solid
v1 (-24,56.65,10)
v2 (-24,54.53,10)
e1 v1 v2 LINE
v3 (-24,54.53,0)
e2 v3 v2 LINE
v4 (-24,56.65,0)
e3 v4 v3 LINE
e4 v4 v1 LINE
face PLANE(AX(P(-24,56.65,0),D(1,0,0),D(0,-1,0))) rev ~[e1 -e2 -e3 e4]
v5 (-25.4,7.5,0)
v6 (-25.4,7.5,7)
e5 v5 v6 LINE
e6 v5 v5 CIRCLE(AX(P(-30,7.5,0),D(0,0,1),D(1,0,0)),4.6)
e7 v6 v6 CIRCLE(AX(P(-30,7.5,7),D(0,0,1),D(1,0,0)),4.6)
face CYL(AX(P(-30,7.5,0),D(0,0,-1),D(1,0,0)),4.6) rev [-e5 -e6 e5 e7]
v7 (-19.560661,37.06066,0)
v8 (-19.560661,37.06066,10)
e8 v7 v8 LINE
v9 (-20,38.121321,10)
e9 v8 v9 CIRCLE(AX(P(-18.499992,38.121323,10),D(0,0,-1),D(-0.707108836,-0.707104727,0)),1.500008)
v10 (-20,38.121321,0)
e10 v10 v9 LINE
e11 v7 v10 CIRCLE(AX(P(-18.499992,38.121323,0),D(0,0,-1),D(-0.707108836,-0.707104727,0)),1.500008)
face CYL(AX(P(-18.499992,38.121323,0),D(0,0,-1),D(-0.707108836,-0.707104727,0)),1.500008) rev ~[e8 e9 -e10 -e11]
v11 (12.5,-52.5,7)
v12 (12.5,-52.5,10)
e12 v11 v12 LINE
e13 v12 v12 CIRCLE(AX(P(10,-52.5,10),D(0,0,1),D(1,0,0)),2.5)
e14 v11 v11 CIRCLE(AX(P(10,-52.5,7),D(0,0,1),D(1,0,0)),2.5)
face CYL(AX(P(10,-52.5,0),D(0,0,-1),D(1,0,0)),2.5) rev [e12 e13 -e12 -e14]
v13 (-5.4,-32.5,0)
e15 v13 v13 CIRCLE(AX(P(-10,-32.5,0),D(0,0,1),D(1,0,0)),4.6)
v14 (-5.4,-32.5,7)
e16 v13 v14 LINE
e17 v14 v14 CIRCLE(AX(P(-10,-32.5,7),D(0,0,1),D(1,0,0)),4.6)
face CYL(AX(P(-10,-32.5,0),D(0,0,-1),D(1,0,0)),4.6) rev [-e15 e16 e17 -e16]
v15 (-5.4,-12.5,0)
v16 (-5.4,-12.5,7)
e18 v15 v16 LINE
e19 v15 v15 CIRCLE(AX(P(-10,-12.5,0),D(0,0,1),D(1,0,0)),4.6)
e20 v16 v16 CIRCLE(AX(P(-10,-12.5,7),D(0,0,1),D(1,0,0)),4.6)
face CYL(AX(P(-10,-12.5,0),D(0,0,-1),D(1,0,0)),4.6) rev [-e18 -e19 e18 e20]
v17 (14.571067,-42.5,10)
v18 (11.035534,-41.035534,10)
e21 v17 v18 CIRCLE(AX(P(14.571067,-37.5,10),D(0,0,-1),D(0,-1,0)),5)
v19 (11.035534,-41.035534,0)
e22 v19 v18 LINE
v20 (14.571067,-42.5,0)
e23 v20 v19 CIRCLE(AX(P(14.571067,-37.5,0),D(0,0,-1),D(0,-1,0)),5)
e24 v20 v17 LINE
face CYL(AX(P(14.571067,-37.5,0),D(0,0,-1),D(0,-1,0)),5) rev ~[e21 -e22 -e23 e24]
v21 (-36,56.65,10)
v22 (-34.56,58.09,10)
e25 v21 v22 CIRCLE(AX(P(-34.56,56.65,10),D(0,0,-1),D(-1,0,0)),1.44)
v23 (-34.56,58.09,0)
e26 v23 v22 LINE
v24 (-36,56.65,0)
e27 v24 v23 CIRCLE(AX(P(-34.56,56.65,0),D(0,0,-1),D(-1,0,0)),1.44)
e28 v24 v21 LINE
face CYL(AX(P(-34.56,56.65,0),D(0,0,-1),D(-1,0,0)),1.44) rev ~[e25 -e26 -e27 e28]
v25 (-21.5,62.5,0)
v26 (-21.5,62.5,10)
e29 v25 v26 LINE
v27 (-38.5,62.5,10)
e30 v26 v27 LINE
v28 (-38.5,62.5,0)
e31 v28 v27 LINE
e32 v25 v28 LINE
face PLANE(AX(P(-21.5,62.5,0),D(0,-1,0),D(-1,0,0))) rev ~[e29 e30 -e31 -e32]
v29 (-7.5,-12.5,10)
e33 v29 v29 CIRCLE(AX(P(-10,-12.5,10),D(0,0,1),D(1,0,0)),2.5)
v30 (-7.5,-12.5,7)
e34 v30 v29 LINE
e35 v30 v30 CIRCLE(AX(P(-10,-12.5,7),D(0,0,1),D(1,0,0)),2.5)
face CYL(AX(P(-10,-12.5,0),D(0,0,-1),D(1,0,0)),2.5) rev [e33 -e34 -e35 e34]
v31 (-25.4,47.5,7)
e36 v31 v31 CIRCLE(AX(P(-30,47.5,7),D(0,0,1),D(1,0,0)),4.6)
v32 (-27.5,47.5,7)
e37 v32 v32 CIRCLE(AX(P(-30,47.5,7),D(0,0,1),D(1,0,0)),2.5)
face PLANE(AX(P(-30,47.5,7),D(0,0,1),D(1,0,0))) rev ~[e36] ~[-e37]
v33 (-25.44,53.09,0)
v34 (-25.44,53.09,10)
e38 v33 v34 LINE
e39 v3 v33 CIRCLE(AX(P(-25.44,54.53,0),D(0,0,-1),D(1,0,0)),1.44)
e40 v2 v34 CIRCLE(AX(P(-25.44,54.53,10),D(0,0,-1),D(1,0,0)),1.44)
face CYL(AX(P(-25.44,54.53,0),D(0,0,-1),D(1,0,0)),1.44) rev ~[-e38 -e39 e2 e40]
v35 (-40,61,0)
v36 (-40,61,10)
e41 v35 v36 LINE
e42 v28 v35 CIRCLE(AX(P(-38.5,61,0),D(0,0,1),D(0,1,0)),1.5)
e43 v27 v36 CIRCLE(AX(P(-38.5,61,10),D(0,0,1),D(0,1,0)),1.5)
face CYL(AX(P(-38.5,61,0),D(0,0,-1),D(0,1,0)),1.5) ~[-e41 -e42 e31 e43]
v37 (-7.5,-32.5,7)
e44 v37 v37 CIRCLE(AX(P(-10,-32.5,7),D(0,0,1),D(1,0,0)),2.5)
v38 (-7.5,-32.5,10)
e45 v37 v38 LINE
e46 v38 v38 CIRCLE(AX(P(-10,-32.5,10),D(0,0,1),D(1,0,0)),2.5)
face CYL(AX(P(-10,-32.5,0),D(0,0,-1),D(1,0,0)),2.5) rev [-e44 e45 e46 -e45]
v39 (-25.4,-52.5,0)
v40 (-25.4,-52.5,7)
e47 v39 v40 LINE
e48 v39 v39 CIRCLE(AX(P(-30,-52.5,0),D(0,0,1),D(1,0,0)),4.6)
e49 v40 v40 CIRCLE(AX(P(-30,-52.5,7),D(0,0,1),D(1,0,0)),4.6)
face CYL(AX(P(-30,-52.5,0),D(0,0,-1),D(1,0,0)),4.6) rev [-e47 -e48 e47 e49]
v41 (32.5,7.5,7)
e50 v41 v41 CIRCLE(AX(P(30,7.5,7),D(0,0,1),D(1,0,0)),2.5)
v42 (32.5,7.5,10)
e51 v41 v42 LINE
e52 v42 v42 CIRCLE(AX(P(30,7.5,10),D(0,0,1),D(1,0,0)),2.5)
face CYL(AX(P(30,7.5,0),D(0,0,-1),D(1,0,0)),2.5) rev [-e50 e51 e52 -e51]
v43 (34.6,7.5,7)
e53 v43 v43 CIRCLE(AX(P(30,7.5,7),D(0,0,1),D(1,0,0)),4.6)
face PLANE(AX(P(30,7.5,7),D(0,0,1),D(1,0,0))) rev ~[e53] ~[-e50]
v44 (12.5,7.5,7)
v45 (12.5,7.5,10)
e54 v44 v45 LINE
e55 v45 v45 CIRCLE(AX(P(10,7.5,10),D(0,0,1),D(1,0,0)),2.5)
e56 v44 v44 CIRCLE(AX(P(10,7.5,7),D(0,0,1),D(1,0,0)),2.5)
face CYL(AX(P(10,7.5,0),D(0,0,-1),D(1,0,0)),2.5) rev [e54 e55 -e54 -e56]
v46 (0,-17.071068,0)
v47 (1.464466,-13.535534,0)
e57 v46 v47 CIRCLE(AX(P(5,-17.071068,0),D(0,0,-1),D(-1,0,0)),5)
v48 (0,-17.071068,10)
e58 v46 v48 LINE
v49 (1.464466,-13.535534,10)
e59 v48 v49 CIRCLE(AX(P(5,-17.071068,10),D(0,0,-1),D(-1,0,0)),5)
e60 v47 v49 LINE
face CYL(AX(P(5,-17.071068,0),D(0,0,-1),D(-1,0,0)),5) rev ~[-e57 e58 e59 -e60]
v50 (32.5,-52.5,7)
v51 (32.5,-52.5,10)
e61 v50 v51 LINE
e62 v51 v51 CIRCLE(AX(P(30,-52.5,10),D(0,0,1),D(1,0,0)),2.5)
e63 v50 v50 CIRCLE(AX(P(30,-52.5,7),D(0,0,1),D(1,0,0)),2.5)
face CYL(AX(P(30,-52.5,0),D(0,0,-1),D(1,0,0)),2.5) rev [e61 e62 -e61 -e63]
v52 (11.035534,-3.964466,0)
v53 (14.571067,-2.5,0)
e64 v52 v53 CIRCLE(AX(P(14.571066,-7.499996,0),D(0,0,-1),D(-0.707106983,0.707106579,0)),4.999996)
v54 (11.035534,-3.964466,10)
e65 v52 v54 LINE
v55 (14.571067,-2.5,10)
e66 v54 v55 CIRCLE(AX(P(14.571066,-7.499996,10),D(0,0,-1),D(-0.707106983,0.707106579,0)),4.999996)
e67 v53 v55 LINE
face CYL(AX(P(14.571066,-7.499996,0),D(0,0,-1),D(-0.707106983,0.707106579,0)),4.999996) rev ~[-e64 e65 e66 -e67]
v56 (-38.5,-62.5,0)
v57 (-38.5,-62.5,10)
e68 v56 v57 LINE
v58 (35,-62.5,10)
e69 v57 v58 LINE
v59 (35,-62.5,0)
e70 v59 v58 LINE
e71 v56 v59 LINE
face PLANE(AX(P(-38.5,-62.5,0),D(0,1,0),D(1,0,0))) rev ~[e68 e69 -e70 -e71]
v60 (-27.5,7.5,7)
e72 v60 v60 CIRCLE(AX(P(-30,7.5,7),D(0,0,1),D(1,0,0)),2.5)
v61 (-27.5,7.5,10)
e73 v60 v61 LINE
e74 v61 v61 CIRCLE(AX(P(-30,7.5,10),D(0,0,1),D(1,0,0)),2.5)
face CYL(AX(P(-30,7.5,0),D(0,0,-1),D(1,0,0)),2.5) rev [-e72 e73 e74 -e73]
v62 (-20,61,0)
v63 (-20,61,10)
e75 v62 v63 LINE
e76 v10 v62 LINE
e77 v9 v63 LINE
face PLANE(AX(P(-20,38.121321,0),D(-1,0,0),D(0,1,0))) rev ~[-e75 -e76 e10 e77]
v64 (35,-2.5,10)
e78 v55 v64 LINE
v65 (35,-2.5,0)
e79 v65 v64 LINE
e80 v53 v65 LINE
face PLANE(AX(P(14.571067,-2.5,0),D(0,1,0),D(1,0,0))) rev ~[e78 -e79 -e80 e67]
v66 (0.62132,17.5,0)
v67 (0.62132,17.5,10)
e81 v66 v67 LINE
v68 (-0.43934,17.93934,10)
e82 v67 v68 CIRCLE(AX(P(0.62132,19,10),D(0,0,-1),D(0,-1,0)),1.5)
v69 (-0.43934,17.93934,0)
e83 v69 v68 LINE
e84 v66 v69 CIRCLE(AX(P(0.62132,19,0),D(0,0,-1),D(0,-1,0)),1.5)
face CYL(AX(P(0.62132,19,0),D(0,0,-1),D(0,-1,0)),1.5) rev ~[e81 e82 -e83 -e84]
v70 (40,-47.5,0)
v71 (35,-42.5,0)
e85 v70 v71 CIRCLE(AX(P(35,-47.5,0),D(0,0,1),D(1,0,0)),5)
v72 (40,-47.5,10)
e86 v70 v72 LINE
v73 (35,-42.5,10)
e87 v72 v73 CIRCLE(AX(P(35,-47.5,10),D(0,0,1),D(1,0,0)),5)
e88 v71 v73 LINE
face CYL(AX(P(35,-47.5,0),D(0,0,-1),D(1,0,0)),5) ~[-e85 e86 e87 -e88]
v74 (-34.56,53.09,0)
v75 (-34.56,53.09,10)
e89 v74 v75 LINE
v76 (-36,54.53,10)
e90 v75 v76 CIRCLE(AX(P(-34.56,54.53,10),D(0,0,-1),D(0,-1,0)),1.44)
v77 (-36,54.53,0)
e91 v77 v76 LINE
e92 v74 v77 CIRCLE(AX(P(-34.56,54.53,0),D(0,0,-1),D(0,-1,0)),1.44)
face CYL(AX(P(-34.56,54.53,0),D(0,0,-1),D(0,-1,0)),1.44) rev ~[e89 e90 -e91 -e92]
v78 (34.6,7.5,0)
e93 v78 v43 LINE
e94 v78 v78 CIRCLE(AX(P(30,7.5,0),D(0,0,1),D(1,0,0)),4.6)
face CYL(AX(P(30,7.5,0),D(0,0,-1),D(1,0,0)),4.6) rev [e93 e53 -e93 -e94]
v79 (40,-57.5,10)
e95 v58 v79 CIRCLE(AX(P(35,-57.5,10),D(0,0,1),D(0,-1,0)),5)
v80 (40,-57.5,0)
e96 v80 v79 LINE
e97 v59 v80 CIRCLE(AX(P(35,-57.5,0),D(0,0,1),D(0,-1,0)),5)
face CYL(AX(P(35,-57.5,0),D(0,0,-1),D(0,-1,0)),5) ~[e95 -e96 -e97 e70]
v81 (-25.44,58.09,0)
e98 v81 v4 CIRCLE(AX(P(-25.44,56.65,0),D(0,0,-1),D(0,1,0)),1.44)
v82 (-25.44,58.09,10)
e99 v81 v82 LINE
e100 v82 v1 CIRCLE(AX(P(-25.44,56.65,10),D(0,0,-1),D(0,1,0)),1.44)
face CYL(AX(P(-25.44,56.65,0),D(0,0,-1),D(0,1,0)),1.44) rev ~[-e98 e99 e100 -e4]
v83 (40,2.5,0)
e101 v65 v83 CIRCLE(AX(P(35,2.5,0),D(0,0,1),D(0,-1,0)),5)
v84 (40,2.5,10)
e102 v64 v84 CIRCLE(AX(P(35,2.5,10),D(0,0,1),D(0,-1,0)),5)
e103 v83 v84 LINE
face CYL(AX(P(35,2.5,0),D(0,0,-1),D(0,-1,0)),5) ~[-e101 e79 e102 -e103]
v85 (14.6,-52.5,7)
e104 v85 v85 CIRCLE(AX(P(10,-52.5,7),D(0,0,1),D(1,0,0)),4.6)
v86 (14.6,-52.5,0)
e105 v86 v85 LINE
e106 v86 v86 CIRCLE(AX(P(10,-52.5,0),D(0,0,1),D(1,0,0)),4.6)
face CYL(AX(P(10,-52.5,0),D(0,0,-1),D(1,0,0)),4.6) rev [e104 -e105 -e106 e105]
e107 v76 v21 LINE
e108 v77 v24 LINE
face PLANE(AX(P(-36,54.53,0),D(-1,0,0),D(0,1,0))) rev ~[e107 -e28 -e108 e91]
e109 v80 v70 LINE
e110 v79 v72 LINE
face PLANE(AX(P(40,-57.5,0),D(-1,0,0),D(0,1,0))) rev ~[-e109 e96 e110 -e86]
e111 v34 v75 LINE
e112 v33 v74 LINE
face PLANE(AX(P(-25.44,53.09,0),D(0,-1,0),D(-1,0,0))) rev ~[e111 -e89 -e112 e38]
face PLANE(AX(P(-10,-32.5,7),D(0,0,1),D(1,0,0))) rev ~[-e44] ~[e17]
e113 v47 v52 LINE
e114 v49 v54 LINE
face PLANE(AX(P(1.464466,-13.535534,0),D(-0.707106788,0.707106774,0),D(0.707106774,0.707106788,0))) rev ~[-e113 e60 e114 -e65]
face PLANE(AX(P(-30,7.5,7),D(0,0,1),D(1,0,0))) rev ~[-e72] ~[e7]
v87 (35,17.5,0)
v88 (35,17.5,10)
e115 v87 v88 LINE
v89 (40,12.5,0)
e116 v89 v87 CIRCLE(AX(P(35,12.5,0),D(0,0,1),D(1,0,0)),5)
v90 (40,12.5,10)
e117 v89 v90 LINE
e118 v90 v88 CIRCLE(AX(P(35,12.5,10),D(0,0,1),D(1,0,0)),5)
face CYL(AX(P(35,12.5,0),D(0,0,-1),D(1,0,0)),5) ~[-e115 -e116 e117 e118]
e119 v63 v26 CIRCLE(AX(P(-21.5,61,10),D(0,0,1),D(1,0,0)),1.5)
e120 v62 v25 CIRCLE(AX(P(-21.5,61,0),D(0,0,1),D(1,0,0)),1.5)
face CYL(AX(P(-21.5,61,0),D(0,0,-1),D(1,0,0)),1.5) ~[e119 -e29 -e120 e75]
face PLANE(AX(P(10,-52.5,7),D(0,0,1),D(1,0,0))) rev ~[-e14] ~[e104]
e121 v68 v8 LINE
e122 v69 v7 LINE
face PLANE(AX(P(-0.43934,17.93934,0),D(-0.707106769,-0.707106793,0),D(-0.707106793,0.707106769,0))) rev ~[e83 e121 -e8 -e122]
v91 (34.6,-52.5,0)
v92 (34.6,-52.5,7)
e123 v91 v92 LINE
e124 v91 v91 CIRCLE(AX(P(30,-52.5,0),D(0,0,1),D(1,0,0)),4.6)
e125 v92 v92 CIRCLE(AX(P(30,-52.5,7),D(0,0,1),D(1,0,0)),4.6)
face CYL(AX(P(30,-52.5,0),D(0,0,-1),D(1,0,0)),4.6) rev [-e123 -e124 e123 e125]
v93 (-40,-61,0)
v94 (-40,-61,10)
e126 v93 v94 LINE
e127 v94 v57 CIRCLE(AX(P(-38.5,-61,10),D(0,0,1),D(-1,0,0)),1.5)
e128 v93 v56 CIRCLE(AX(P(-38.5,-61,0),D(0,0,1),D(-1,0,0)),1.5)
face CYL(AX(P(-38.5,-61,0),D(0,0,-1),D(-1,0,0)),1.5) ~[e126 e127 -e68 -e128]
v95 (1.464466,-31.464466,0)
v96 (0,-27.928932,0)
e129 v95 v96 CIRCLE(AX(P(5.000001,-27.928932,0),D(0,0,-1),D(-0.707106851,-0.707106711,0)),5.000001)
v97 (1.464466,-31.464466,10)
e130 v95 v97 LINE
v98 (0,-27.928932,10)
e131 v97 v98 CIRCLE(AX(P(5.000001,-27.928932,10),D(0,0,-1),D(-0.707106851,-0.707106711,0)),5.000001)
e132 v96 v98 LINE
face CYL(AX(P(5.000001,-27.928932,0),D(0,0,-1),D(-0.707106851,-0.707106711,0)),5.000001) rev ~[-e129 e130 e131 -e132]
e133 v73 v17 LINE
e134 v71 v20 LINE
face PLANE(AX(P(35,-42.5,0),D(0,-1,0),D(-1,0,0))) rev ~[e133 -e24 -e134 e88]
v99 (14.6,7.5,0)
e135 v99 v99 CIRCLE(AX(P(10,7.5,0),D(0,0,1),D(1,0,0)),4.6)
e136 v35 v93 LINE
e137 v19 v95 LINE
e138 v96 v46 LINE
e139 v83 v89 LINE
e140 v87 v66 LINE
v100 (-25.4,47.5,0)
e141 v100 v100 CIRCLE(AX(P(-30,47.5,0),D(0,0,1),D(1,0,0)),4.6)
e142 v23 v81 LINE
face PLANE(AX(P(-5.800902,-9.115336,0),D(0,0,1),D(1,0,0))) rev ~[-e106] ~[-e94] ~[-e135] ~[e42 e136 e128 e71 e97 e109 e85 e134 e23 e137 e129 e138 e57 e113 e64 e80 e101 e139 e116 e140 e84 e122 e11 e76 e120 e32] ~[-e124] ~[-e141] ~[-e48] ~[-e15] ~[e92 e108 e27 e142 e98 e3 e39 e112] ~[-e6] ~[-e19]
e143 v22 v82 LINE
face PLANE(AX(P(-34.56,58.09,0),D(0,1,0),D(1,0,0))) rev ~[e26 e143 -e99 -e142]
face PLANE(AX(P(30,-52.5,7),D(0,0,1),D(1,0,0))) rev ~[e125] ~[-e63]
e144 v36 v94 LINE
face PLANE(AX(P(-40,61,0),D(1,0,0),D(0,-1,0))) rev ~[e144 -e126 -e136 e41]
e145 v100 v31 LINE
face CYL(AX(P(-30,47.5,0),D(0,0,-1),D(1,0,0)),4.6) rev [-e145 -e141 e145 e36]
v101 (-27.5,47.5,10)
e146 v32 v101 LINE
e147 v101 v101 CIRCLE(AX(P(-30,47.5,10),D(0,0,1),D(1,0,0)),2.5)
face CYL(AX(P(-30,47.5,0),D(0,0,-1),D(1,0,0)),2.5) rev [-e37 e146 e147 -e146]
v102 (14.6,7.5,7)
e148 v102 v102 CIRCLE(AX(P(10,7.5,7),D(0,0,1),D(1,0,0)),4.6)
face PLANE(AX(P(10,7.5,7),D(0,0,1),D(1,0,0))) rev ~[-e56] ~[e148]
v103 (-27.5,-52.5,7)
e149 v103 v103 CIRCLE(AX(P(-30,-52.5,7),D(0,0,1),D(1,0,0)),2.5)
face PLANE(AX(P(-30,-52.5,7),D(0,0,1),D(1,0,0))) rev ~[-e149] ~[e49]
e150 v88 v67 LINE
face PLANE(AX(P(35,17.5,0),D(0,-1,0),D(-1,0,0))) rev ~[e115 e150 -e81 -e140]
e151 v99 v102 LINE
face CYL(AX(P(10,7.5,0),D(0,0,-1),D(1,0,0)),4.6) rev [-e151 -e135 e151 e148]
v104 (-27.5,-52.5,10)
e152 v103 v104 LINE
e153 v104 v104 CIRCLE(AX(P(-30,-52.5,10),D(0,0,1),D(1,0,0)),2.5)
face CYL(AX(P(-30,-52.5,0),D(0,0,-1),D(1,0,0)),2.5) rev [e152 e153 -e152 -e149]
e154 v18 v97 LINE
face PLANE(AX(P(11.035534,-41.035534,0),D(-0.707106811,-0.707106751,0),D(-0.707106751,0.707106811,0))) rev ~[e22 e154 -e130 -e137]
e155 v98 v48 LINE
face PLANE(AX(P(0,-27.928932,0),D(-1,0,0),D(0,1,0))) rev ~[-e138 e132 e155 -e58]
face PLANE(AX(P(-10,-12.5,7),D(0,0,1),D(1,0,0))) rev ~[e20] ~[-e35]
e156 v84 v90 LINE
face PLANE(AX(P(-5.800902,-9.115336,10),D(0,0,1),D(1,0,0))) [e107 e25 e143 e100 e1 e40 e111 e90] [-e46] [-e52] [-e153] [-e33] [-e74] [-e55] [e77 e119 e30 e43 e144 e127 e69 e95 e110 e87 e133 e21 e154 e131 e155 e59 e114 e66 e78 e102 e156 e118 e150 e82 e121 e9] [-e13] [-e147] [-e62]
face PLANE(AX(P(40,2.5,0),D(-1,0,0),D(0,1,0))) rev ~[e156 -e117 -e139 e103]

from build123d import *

# Parameters (mm, degrees)
F0_R     = 4.6
F0_R_2   = 2.5
F1_DEPTH = 10
F2_DEPTH = 7


# Not quite as in the source:
# - ends of sketch curves that miss each other by under 0.0002 mm in the source are joined


with BuildPart() as f1:
    # F0 (on Top) → F1 (new body)
    with BuildSketch(Plane.XY):
        with BuildLine():
            ThreePointArc((-40, -61), (-39.5606601718, -62.0606601718), (-38.5, -62.5))
            Line((-38.5, -62.5), (35, -62.5))
            ThreePointArc((35, -62.5), (38.5355339059, -61.0355339059), (40, -57.5))
            Line((40, -57.5), (40, -47.5))
            ThreePointArc((40, -47.5), (38.5355339059, -43.9644660941), (35, -42.5))
            Line((35, -42.5), (14.571067, -42.5))
            ThreePointArc((14.571067, -42.5), (12.6576501648, -42.1193977979), (11.0355335941, -41.0355344059))
            Line((11.0355335941, -41.0355344059), (1.464466, -31.464466))
            ThreePointArc((1.464466, -31.464466), (0.3806023374, -29.8423491618), (0, -27.928932))
            Line((0, -27.928932), (0, -17.071068))
            ThreePointArc((0, -17.071068), (0.3806023374, -15.1576508382), (1.4644660941, -13.5355340941))
            Line((1.4644660941, -13.5355340941), (11.035534, -3.964466))
            ThreePointArc((11.035534, -3.964466), (12.6576501648, -2.8806022021), (14.571067, -2.5))
            Line((14.571067, -2.5), (35, -2.5))
            ThreePointArc((35, -2.5), (38.5355339059, -1.0355339059), (40, 2.5))
            Line((40, 2.5), (40, 12.5))
            ThreePointArc((40, 12.5), (38.5355339059, 16.0355339059), (35, 17.5))
            Line((35, 17.5), (0.62132, 17.5))
            ThreePointArc((0.62132, 17.5), (0.0472948515, 17.6141807012), (-0.4393401718, 17.9393398282))
            Line((-0.4393401718, 17.9393398282), (-19.560661, 37.06066))
            ThreePointArc((-19.560661, 37.06066), (-19.8858192988, 37.5472958515), (-20, 38.121321))
            Line((-20, 38.121321), (-20, 61))
            ThreePointArc((-20, 61), (-20.4393398282, 62.0606601718), (-21.5, 62.5))
            Line((-21.5, 62.5), (-38.5, 62.5))
            ThreePointArc((-38.5, 62.5), (-39.5606601718, 62.0606601718), (-40, 61))
            Line((-40, 61), (-40, -61))
        make_face()
        with Locations((-30, -52.5)):
            Circle(F0_R, mode=Mode.SUBTRACT)
        with Locations((-10, -32.5)):
            Circle(F0_R, mode=Mode.SUBTRACT)
        with Locations((-10, -12.5)):
            Circle(F0_R, mode=Mode.SUBTRACT)
        with Locations((10, -52.5)):
            Circle(F0_R, mode=Mode.SUBTRACT)
        with Locations((30, -52.5)):
            Circle(F0_R, mode=Mode.SUBTRACT)
        with Locations((-30, 7.5)):
            Circle(F0_R, mode=Mode.SUBTRACT)
        with Locations((-30, 47.5)):
            Circle(F0_R, mode=Mode.SUBTRACT)
        with BuildLine():
            Line((-36, 54.53), (-36, 56.65))
            ThreePointArc((-36, 56.65), (-35.5782337649, 57.6682337649), (-34.56, 58.09))
            Line((-34.56, 58.09), (-25.44, 58.09))
            ThreePointArc((-25.44, 58.09), (-24.4217662351, 57.6682337649), (-24, 56.65))
            Line((-24, 56.65), (-24, 54.53))
            ThreePointArc((-24, 54.53), (-24.4217662351, 53.5117662351), (-25.44, 53.09))
            Line((-25.44, 53.09), (-34.56, 53.09))
            ThreePointArc((-34.56, 53.09), (-35.5782337649, 53.5117662351), (-36, 54.53))
        make_face(mode=Mode.SUBTRACT)
        with Locations((10, 7.5)):
            Circle(F0_R, mode=Mode.SUBTRACT)
        with Locations((30, 7.5)):
            Circle(F0_R, mode=Mode.SUBTRACT)
        with Locations((-30, 47.5)):
            Circle(F0_R)
        with Locations((-30, 47.5)):
            Circle(F0_R_2, mode=Mode.SUBTRACT)
        with Locations((-30, 7.5)):
            Circle(F0_R)
        with Locations((-30, 7.5)):
            Circle(F0_R_2, mode=Mode.SUBTRACT)
        with Locations((-30, -52.5)):
            Circle(F0_R)
        with Locations((-30, -52.5)):
            Circle(F0_R_2, mode=Mode.SUBTRACT)
        with Locations((-10, -32.5)):
            Circle(F0_R)
        with Locations((-10, -32.5)):
            Circle(F0_R_2, mode=Mode.SUBTRACT)
        with Locations((-10, -12.5)):
            Circle(F0_R)
        with Locations((-10, -12.5)):
            Circle(F0_R_2, mode=Mode.SUBTRACT)
        with Locations((10, 7.5)):
            Circle(F0_R)
        with Locations((10, 7.5)):
            Circle(F0_R_2, mode=Mode.SUBTRACT)
        with Locations((30, 7.5)):
            Circle(F0_R)
        with Locations((30, 7.5)):
            Circle(F0_R_2, mode=Mode.SUBTRACT)
        with Locations((10, -52.5)):
            Circle(F0_R)
        with Locations((10, -52.5)):
            Circle(F0_R_2, mode=Mode.SUBTRACT)
        with Locations((30, -52.5)):
            Circle(F0_R)
        with Locations((30, -52.5)):
            Circle(F0_R_2, mode=Mode.SUBTRACT)
    extrude(amount=F1_DEPTH)

    # F0 (on Top) → F2 (cut, through all)
    with BuildSketch(Plane.XY):
        with Locations((30, 7.5)):
            Circle(F0_R)
        with Locations((30, 7.5)):
            Circle(F0_R_2, mode=Mode.SUBTRACT)
        with Locations((10, 7.5)):
            Circle(F0_R)
        with Locations((10, 7.5)):
            Circle(F0_R_2, mode=Mode.SUBTRACT)
        with Locations((30, -52.5)):
            Circle(F0_R)
        with Locations((30, -52.5)):
            Circle(F0_R_2, mode=Mode.SUBTRACT)
        with Locations((10, -52.5)):
            Circle(F0_R)
        with Locations((10, -52.5)):
            Circle(F0_R_2, mode=Mode.SUBTRACT)
        with Locations((-10, -32.5)):
            Circle(F0_R)
        with Locations((-10, -32.5)):
            Circle(F0_R_2, mode=Mode.SUBTRACT)
        with Locations((-10, -12.5)):
            Circle(F0_R)
        with Locations((-10, -12.5)):
            Circle(F0_R_2, mode=Mode.SUBTRACT)
        with Locations((-30, 7.5)):
            Circle(F0_R)
        with Locations((-30, 7.5)):
            Circle(F0_R_2, mode=Mode.SUBTRACT)
        with Locations((-30, -52.5)):
            Circle(F0_R)
        with Locations((-30, -52.5)):
            Circle(F0_R_2, mode=Mode.SUBTRACT)
        with Locations((-30, 47.5)):
            Circle(F0_R)
        with Locations((-30, 47.5)):
            Circle(F0_R_2, mode=Mode.SUBTRACT)
    extrude(amount=F2_DEPTH, mode=Mode.SUBTRACT)


solid = f1.part
